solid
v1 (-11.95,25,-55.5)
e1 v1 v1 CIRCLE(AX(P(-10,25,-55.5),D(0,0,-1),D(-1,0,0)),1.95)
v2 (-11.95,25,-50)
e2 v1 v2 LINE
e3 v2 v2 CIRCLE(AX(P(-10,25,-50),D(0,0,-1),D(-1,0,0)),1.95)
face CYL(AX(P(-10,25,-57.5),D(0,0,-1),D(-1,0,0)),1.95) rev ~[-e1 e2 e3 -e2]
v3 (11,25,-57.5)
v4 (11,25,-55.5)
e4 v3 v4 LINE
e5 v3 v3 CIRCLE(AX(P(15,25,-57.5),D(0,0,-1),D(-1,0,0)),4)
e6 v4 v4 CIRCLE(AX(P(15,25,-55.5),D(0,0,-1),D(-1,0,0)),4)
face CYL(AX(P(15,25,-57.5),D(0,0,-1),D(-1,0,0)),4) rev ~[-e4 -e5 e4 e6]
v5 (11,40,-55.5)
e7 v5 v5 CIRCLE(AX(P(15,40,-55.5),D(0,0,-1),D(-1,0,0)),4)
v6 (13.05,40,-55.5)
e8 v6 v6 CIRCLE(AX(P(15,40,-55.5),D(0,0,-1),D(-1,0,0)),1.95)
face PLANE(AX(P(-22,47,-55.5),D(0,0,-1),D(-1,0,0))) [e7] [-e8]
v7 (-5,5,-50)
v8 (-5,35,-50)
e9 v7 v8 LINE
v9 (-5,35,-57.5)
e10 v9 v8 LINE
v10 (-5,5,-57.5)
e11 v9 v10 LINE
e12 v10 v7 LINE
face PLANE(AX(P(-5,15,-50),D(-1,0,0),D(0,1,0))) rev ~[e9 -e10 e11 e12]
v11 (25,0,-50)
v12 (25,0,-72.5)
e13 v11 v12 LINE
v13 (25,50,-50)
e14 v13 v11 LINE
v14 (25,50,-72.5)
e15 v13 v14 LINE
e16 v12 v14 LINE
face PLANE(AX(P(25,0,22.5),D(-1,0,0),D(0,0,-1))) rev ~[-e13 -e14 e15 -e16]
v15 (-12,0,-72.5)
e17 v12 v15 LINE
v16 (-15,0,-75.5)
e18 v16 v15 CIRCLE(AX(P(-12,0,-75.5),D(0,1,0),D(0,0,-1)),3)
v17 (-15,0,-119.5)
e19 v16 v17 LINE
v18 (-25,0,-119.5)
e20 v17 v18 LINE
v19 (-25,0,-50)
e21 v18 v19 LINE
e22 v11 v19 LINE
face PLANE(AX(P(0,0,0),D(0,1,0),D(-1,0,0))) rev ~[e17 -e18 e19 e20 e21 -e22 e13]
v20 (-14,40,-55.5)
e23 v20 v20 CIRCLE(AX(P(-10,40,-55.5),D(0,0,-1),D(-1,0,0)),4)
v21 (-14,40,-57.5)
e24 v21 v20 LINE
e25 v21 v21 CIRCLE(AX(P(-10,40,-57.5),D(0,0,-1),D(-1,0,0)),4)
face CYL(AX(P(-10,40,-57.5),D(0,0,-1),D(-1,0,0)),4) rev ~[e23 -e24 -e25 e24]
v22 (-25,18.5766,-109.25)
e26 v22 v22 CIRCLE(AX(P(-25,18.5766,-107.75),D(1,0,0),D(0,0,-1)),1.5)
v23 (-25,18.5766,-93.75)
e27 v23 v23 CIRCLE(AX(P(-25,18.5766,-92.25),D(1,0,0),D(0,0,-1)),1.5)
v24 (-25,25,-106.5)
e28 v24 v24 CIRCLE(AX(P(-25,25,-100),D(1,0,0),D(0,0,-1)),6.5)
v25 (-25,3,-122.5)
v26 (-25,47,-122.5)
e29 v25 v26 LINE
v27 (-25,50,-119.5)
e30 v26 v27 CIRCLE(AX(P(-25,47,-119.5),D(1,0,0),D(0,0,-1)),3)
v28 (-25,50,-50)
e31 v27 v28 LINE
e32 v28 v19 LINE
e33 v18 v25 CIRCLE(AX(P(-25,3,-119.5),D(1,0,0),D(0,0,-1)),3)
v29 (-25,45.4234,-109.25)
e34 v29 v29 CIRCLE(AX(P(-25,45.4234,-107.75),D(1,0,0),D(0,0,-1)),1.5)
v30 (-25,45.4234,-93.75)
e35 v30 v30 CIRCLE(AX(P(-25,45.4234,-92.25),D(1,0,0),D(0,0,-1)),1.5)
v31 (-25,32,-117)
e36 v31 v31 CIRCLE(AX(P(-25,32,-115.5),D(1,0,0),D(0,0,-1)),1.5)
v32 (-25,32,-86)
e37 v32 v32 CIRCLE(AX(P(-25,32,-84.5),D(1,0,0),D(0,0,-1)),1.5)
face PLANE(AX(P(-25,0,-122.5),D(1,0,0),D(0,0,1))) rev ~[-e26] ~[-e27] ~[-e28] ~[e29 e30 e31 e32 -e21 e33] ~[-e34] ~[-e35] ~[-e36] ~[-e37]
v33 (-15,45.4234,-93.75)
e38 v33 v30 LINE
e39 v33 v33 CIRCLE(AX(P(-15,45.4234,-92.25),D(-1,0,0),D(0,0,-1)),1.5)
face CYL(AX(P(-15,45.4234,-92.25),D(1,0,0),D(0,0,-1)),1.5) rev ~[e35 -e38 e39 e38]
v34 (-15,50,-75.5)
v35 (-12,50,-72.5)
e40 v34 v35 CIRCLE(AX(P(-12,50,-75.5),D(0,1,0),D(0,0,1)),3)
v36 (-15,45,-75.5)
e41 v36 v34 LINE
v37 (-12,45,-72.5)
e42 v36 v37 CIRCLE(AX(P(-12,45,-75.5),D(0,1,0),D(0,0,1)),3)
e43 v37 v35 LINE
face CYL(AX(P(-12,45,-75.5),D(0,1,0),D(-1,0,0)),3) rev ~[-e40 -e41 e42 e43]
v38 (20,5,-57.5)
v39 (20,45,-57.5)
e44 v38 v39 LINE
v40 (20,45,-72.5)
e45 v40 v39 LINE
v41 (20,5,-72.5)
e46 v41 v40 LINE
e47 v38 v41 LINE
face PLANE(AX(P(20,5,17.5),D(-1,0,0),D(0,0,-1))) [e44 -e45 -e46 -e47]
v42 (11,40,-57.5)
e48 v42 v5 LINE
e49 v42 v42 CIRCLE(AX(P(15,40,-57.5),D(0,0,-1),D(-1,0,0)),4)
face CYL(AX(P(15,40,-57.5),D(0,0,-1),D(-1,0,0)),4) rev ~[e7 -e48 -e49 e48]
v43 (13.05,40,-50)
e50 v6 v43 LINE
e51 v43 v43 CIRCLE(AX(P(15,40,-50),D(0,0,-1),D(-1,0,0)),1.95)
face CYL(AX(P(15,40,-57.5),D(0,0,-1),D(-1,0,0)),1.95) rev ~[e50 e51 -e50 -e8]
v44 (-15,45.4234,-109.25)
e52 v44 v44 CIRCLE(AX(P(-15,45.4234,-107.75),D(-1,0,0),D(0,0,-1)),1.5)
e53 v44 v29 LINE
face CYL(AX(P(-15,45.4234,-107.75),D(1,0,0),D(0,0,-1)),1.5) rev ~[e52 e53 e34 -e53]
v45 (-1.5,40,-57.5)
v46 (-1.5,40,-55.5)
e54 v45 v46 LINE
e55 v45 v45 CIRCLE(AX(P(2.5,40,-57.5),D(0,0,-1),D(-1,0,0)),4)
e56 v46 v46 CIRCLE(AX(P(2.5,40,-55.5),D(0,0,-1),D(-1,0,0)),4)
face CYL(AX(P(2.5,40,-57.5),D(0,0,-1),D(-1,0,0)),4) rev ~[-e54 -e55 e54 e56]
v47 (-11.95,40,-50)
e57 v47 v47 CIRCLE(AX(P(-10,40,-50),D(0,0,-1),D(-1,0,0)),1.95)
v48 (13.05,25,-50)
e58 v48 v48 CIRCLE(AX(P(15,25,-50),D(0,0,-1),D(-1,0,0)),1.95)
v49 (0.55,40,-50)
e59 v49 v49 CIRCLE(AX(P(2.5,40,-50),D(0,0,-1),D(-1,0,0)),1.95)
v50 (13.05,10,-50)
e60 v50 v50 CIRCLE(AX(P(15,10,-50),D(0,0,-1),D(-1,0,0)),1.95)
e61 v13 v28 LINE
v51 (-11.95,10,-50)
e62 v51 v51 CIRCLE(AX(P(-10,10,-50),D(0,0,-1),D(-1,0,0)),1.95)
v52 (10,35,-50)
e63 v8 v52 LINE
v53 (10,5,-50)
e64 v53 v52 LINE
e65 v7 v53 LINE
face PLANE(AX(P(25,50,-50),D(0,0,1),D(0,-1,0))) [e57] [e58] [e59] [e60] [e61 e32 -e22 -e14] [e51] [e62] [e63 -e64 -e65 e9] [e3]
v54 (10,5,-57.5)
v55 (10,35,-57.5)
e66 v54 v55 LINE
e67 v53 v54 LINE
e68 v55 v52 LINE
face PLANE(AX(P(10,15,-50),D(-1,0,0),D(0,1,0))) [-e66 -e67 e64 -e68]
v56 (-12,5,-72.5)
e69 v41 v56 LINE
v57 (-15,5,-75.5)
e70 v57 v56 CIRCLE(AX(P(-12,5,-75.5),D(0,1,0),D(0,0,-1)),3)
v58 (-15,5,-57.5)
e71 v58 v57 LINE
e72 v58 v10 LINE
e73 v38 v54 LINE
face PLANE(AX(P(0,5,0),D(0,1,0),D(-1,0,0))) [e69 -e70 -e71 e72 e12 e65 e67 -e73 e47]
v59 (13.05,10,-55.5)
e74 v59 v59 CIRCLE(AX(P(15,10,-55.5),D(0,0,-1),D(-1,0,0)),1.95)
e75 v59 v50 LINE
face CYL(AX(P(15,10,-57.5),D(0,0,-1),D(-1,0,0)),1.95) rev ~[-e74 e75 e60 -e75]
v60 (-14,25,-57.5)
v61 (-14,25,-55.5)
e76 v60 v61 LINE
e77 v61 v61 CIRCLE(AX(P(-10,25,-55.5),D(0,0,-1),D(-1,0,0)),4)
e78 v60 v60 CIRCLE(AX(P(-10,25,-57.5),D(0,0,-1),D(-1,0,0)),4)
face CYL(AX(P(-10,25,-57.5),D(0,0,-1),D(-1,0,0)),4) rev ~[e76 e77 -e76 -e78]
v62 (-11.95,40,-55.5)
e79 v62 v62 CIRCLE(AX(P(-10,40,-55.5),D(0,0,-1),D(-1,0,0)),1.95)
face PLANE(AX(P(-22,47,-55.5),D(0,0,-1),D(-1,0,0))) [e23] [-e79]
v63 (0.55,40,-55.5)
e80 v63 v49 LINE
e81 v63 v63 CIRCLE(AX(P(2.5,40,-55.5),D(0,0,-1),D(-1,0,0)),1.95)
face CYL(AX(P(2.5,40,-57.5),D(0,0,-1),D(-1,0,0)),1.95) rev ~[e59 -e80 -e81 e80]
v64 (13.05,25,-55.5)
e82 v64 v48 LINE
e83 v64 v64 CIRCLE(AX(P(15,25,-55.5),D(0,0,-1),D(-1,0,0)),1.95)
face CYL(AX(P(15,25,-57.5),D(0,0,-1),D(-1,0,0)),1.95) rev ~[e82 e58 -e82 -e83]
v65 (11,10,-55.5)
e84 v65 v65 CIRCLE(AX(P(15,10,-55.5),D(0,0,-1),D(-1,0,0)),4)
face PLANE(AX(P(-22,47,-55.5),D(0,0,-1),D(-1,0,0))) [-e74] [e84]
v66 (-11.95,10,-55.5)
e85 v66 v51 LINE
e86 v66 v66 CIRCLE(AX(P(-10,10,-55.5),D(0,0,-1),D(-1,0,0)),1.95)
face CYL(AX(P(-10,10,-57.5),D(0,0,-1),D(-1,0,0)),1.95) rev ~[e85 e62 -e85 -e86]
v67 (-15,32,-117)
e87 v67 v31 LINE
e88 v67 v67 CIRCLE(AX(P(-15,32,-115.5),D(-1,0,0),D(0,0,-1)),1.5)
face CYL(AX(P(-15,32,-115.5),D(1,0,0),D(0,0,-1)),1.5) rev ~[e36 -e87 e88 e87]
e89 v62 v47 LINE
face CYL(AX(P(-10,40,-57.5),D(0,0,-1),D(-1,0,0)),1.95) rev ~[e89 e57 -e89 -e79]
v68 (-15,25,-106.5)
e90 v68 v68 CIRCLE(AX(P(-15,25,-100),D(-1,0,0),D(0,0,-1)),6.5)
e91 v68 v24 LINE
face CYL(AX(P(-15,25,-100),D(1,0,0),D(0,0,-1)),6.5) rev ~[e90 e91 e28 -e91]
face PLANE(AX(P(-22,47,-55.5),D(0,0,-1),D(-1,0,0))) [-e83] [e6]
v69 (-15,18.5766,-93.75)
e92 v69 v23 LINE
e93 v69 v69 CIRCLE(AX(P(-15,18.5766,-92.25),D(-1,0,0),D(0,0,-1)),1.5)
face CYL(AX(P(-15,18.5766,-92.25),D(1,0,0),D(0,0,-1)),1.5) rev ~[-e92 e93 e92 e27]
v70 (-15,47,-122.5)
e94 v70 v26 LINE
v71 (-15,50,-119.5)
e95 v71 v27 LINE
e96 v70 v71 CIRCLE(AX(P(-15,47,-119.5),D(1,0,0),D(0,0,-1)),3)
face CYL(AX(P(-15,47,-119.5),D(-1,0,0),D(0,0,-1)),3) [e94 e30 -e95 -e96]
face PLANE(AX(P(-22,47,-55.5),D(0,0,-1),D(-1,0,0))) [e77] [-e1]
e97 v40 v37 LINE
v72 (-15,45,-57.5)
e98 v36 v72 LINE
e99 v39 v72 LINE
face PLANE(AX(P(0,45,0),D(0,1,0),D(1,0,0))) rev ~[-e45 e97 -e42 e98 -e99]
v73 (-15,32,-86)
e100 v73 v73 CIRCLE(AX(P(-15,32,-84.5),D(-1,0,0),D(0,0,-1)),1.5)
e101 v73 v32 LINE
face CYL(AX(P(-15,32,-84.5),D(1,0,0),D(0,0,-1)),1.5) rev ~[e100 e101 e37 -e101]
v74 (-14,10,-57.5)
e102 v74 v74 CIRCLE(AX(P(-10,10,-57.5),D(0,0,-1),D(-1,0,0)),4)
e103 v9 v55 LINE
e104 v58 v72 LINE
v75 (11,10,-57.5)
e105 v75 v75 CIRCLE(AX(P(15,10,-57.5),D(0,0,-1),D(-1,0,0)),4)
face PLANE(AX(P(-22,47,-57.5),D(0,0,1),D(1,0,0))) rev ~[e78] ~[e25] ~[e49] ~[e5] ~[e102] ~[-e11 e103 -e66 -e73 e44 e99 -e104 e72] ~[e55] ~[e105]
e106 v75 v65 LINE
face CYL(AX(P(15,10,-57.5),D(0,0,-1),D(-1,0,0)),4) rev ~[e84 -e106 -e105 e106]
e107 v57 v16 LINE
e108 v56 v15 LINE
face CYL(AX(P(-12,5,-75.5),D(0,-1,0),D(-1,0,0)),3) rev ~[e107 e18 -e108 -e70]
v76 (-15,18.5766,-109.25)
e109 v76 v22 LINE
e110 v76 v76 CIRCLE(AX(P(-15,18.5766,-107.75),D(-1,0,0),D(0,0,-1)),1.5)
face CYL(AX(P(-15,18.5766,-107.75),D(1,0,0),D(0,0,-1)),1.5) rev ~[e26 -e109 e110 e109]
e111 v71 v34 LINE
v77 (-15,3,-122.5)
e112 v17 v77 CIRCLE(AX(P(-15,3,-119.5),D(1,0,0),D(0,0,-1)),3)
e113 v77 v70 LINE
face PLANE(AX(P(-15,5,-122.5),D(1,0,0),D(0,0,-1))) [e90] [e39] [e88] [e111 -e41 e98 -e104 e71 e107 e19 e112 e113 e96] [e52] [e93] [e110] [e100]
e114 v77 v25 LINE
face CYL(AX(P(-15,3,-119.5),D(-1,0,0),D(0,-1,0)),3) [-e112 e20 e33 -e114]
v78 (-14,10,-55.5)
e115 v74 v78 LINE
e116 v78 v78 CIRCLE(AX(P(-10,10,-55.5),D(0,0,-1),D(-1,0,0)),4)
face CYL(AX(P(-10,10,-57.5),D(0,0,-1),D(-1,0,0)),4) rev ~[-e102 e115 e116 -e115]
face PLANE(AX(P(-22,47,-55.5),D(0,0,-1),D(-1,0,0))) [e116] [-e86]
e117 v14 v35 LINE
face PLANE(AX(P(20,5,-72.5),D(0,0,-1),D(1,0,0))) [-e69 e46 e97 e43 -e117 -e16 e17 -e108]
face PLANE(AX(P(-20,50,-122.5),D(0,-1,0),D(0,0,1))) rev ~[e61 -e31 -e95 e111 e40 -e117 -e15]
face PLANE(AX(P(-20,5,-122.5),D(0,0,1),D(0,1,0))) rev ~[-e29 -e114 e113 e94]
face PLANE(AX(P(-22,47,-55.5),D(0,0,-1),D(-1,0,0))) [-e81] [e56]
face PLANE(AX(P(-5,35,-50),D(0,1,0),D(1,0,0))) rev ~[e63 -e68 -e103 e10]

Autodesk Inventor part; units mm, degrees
ref_plane "YZ Plane" through (0, 0, 0) normal (1, 0, 0) x (0, 1, 0)
ref_plane "XZ Plane" through (0, 0, 0) normal (0, 1, 0) x (-1, 0, 0)
sketch "Sketch1" plane through (0, 0, 0) normal (0, 1, 0) x (-1, 0, 0)
  line L0 (25, 22.5) -> (-25, 22.5)
  line L1 (-25, 22.5) -> (-25, -122.5)
  line L2 (-25, -122.5) -> (25, -122.5)
  line L3 (25, -122.5) -> (25, 22.5)
  circle A0 centre (0, 0) radius 3.4379
  dimension "d0" = 50
  dimension "d1" = 145
  dimension "d2" = 25
  dimension "d3" = 22.5
  dimension "d4" = 6.8759
  dimension "d5" = 0
  dimension "d6" = 0
extrude "Extrusion1" add sketch "Sketch1" along normal blind 5 contours L3 L2 L1 L0 | A0
sketch "Sketch2" plane through (0, 5, 0) normal (0, 1, 0) x (1, 0, 0)
  line L0 (-20, -17.5) -> (20, -17.5)
  line L1 (20, -17.5) -> (20, 117.5)
  line L2 (20, 117.5) -> (-20, 117.5)
  line L3 (-20, 117.5) -> (-20, -17.5)
  line L4 (-25, -22.5) -> (25, -22.5) projected
  line L5 (-25, 122.5) -> (-25, -22.5) projected
  line L6 (25, -22.5) -> (25, 122.5) projected
  line L7 (25, 122.5) -> (-25, 122.5) projected
  line L8 (-25, 72.5) -> (25, 72.5)
  point P0 (0, 0)
  point P1 (-20, 72.5)
  point P2 (20, 72.5)
  dimension "d9" = 5
  dimension "d10" = 5
  dimension "d11" = 5
  dimension "d12" = 5
  dimension "d13" = 50
extrude "Extrusion2" add sketch "Sketch2" along normal blind 45 contours L0 L1 L8 L6 L4 L5 L3
sketch "Sketch3" plane through (0, 50, 0) normal (0, 1, 0) x (1, 0, 0)
  line L0 (-25, -22.5) -> (25, -22.5) projected
  line L1 (25, 72.5) -> (25, 122.5) projected
  line L2 (-25, -22.5) -> (25, -22.5)
  line L3 (25, -22.5) -> (25, 72.5)
  line L4 (25, 72.5) -> (-25, 72.5)
  line L5 (-25, 72.5) -> (-25, -22.5)
  point P0 (0, 0)
extrude "Extrusion3" add sketch "Sketch3" against normal blind 5
sketch "Sketch4" plane through (20, 5, 17.5) normal (0, 0, -1) x (-1, 0, 0)
  line L0 (0, 0) -> (0, 40) projected
  line L1 (40, 0) -> (40, 40) projected
  line L2 (0, 20) -> (40, 20)
  line L3 (40, 20) -> (40, 0)
  line L4 (40, 0) -> (0, 0)
  line L5 (0, 0) -> (0, 20)
  point P0 (20, -5)
  dimension "d18" = 20
extrude "Extrusion4" add sketch "Sketch4" along normal blind 45
sketch "Sketch5" plane through (0, 0, 0) normal (0, -1, 0) x (1, 0, 0)
  circle A0 centre (0, 0) radius 9.5
  dimension "d21" = 19
extrude "Extrusion5" cut sketch "Sketch5" against normal blind 12
sketch "Sketch6" plane through (0, 0, 0) normal (0, -1, 0) x (1, 0, 0)
  circle A0 centre (0, 0) radius 11.5
  dimension "d24" = 23
extrude "Extrusion6" cut sketch "Sketch6" against normal blind 6.5
sketch "Sketch7" plane through (0, 12, 0) normal (0, -1, 0) x (1, 0, 0)
  circle A0 centre (0, 0) radius 6.2
  line L0 (0, 6.7252) -> (0, 0)
  line L1 (0, 0) -> (-6.727, -3.8838)
  line L2 (0, 0) -> (6.6601, -3.8452)
  circle A1 centre (0, 6.2) radius 1.45
  circle A2 centre (-5.3694, -3.1) radius 1.45
  circle A3 centre (5.3694, -3.1) radius 1.45
  dimension "d27" = 12.4
  dimension "d28" = 120
  dimension "d29" = 120
  dimension "d30" = 2.9
  dimension "d31" = 2.9
  dimension "d32" = 2.9
extrude "Extrusion7" cut sketch "Sketch7" against normal blind 15 contours A1 L0 A0 | A0 A1 | A3 L2 A0 | A0 L2 A3 | L0 A1 A0 | L2 A3 A0 | A0 A3 L2 | A2 L1 A0 | A0 L1 A2 | A2 A0 L1 | A2 L1 A0
sketch "Sketch8" plane through (-20, 25, 17.5) normal (0, 1, 0) x (1, 0, 0)
  circle A0 centre (14.6306, 20.6) radius 1.45 projected
  circle A1 centre (14.6306, 20.6) radius 4
  circle A2 centre (20, 11.3) radius 1.45 projected
  circle A3 centre (20, 11.3) radius 4
  circle A4 centre (25.3694, 20.8298) radius 4
  point P0 (20, 17.5)
  dimension "d35" = 8
  dimension "d36" = 8
  dimension "d37" = 8
extrude "Extrusion8" cut sketch "Sketch8" against normal blind 7
sketch "Sketch10" plane through (-20, 5, -72.5) normal (1, 0, 0) x (0, 0, -1)
  line L0 (-45, 20) -> (-45, 0) projected
  line L1 (-45, 0) -> (50, 0)
  line L2 (50, 0) -> (50, 45)
  line L3 (50, 45) -> (-45, 45)
  line L4 (-45, 45) -> (-45, 0)
  point P0 (-72.5, -5)
  dimension "d44" = 45
  dimension "d45" = 95
extrude "Extrusion9" add sketch "Sketch10" against normal blind 5
sketch "Sketch11" plane through (-20, 5, -122.5) normal (1, 0, 0) x (0, 0, -1)
  line L0 (-140, 20) -> (-95, 20) projected
  line L1 (-140, 40) -> (-140, 20)
  line L2 (-140, 20) -> (-95, 20)
  line L3 (-95, 20) -> (-95, 0.1891)
  line L4 (0, 0) -> (-95, 0) projected
  line L5 (-95, 0.1891) -> (-95, 0)
  line L6 (-95, 0) -> (0, 0)
  line L7 (0, 0) -> (0, 45) projected
  line L8 (0, 0) -> (0, 45)
  line L9 (0, 45) -> (-50, 45)
  line L10 (-50, 40) -> (-50, 45) projected
  line L11 (-50, 45) -> (-50, 40)
  line L12 (-50, 40) -> (-140, 40)
  point P0 (-122.5, -5)
  point P1 (-50, 45)
extrude "Extrusion10" add sketch "Sketch11" along normal blind 5
sketch "Sketch12" plane through (-15, 5, -122.5) normal (1, 0, 0) x (0, 0, -1)
  circle A0 centre (-22.5, 20) radius 6.5
  circle A1 centre (50.1316, 17.215) radius 18.4
  circle A2 centre (57.8816, 30.6384) radius 1.5
  circle A3 centre (57.8816, 30.6384) radius 1.5
  circle A4 centre (65.6316, 17.215) radius 1.5
  circle A5 centre (65.6316, 17.215) radius 1.5
  circle A6 centre (57.8816, 3.7916) radius 1.5
  circle A7 centre (57.8816, 3.7916) radius 1.5
  circle A8 centre (42.3816, 3.7916) radius 1.5
  circle A9 centre (42.3816, 3.7916) radius 1.5
  circle A10 centre (34.6316, 17.215) radius 1.5
  circle A11 centre (34.6316, 17.215) radius 1.5
  circle A12 centre (42.3816, 30.6384) radius 1.5
  circle A13 centre (42.3816, 30.6384) radius 1.5
  circle A14 centre (50.1316, 17.215) radius 15.5
  circle A15 centre (50.1316, 17.215) radius 18.4
  line L0 (57.8816, 30.6384) -> (50.1316, 17.215)
  line L1 (50.1316, 17.215) -> (65.6316, 17.215)
  line L2 (42.3816, 3.7916) -> (50.1316, 17.215)
  line L3 (50.1316, 17.215) -> (34.6316, 17.215)
  line L4 (42.3816, 30.6384) -> (50.1316, 17.215)
  line L5 (57.8816, 3.7916) -> (50.1316, 17.215)
  circle A16 centre (50.1316, 10.215) radius 6
  circle A17 centre (50.1316, 10.215) radius 6
  circle A18 centre (-22.5, 27) radius 15.5
  line L6 (0, 0) -> (0, 45) projected
  line L7 (0, 45) -> (-50, 45) projected
  line L8 (-22.5, 27) -> (-4.9973, 27)
  line L9 (-22.5, 27) -> (-39.7636, 27)
  line L10 (-22.5, 27) -> (-13.3528, 42.8433)
  line L11 (-22.5, 27) -> (-30.25, 40.4234)
  line L12 (-22.5, 27) -> (-30.25, 13.5766)
  line L13 (-22.5, 27) -> (-14.75, 13.5766)
  circle A19 centre (-14.75, 40.4234) radius 1.5
  circle A20 centre (-30.25, 40.4234) radius 1.5
  circle A21 centre (-7, 27) radius 1.5
  circle A22 centre (-38, 27) radius 1.5
  circle A23 centre (-30.25, 13.5766) radius 1.5
  circle A24 centre (-14.75, 13.5766) radius 1.5
  point P0 (-122.5, -5)
  dimension "d60" = 31
  dimension "d52" = 13
  dimension "d53" = 36.8
  dimension "d54" = 3
  dimension "d55" = 3
  dimension "d56" = 3
  dimension "d57" = 3
  dimension "d58" = 3
  dimension "d59" = 3
  dimension "d61" = 7
  dimension "d62" = 60
  dimension "d63" = 60
  dimension "d64" = 15.5
  dimension "d65" = 12
  dimension "d66" = 31
  dimension "d67" = 7
  dimension "d68" = 22.5
  dimension "d69" = 18
  dimension "d70" = 25
  dimension "d71" = 60
  dimension "d72" = 60
  dimension "d73" = 60
  dimension "d74" = 3
  dimension "d75" = 3
  dimension "d76" = 3
  dimension "d77" = 3
  dimension "d78" = 3
  dimension "d79" = 3
extrude "Extrusion11" cut sketch "Sketch12" against normal blind 10 contours A0 L13 | L13 A0 L12 | L12 A0 | A24 A18 L13 | L13 A18 A24 | A21 A18 L8 | L8 A18 A21 | A22 A18 L9 | L9 A18 A22 | A19 A18 L10 | L10 A18 A19 | A20 A18 L11 | L11 A18 A20 | A23 A18 L12 | L12 A18 A23 | A18 A24 | L8 A21 A18 | A18 A21 L8 | L9 A22 A18 | A18 A22 L9 | L10 A19 A18 | A18 A19 L10 | A18 A20 | A18 A23 picked at (-20.282, 19.0179)
sketch "Sketch13" plane through (0, 50, 0) normal (0, 1, 0) x (1, 0, 0)
  line L0 (-15, 27.5) -> (-15, -17.5) projected
  line L1 (20, -17.5) -> (20, 72.5) projected
  line L2 (-15, -17.5) -> (20, -17.5)
  line L3 (20, -17.5) -> (20, 27.5)
  line L4 (20, 27.5) -> (-15, 27.5)
  line L5 (-15, 27.5) -> (-15, -17.5)
  line L6 (-15, -17.5) -> (15, -17.5)
  line L7 (15, -17.5) -> (15, 27.5)
  line L8 (15, 27.5) -> (-15, 27.5)
  line L9 (-15, 27.5) -> (-15, -17.5)
  line L10 (-17.6229, -12.5) -> (23.226, -12.5)
  line L11 (25, -22.5) -> (25, 122.5) projected
  line L12 (-25, -22.5) -> (25, -22.5) projected
  point P0 (0, 0)
  point P1 (-15, 27.5)
  point P2 (-15, -12.5)
  point P3 (15, -12.5)
  dimension "d82" = 45
  dimension "d83" = 30
  dimension "d100" = 10
extrude "Extrusion12" cut sketch "Sketch13" against normal blind 10 contours L4 L7 L10 L0
sketch "Sketch14" plane through (25, 0, 22.5) normal (1, 0, 0) x (0, 0, -1)
  line L0 (145, 5) -> (50, 5) projected
  line L1 (95, 5) -> (95, 50) projected
  line L2 (10, 45) -> (85, 45)
  line L3 (85, 45) -> (85, 5)
  line L4 (85, 5) -> (10, 5)
  line L5 (10, 5) -> (10, 45)
  line L6 (0, 0) -> (0, 50) projected
  line L7 (0, 50) -> (95, 50) projected
  line L8 (0, 0) -> (145, 0) projected
  line L9 (10, 37) -> (90.8755, 37)
  line L10 (90.8755, 29) -> (3.3121, 29)
  line L11 (50, 25) -> (5, 25) projected
  line L12 (5, 21) -> (92.1289, 21)
  line L13 (3.3121, 13) -> (95, 13)
  line L14 (50, 5) -> (50, 25) projected
  line L15 (50, 5) -> (50, 25)
  line L16 (50, 25) -> (10, 25)
  line L17 (50, 25) -> (5, 25) projected
  line L18 (65, 47.5096) -> (65, 32.8574)
  point P0 (22.5, 0)
  point P1 (5, 45)
  point P2 (3.3121, 29)
  point P3 (85, 13)
  point P4 (10, 13)
  point P5 (85, 5)
  point P6 (10, 21)
  point P7 (85, 21)
  point P8 (85, 29)
  point P9 (10, 29)
  point P10 (85, 37)
  point P11 (50, 21)
  point P12 (10, 25)
  point P13 (50, 13)
  point P14 (65, 37)
  point P15 (65, 45)
  dimension "d87" = 10
  dimension "d88" = 10
  dimension "d89" = 5
  dimension "d90" = 5
  dimension "d91" = 8
  dimension "d92" = 8
  dimension "d93" = 8
  dimension "d94" = 8
  dimension "d162" = 30
extrude "Extrusion13" cut sketch "Sketch14" against normal blind 5 contours L9 L5 L2 L18
fillet "Fillet1" radius 3 6 edges at (-15, 47.5, -72.5) (-15, 25, -5) (2.5, 25, 17.5) (20, 35, 17.5) (-15, 47.5, -27.5) (15, 47.5, -27.5)
fillet "Fillet2" radius 3 4 edges at (22.5, 45, 12.5) (22.5, 37, 12.5) (22.5, 37, -42.5) (22.5, 45, -42.5)
fillet "Fillet3" radius 3 4 edges at (25, 25, 22.5) (0, 0, 22.5) (-25, 25, 22.5) (0, 50, 22.5)
fillet "Fillet4" radius 3 2 edges at (-15, 47.5, 12.5) (15, 47.5, 12.5)
sketch "Sketch15" plane through (20, 5, -27.5) normal (0, 0, -1) x (-1, 0, 0)
  circle A0 centre (20, 3.75) radius 1.95
  line L0 (45, -5) -> (45, 45) projected
  line L1 (-5, -5) -> (45, -5) projected
  point P0 (20, -5)
  dimension "d102" = 25
  dimension "d103" = 8.75
  dimension "d107" = 3.9
extrude "Extrusion14" cut sketch "Sketch15" against normal blind 20
sketch "Sketch16" plane through (20, 5, -27.5) normal (0, 0, -1) x (-1, 0, 0)
  circle A0 centre (20, 3.75) radius 1.95 projected
  circle A1 centre (20, 3.75) radius 4
  point P0 (20, -5)
  dimension "d106" = 8
extrude "Extrusion15" cut sketch "Sketch16" against normal blind 8
sketch "Sketch17" plane through (0, 5, 0) normal (0, 1, 0) x (1, 0, 0)
  line L0 (20, 72.5) -> (25, 72.5) projected
  line L1 (-15, 122.5) -> (-15, 75.5) projected
  line L2 (25, 72.5) -> (-15, 72.5)
  line L3 (-15, 72.5) -> (-15, 122.5)
  line L4 (-15, 122.5) -> (25, 122.5)
  line L5 (25, 122.5) -> (25, 72.5)
  point P0 (0, 0)
extrude "Extrusion16" cut sketch "Sketch17" against normal blind 8
fillet "Fillet5" radius 3 1 edges at (-15, 2.5, -72.5)
fillet "Fillet6" radius 3 2 edges at (-20, 50, -122.5) (-20, 0, -122.5)
sketch "Sketch18" plane through (25, 0, -72.5) normal (1, 0, 0) x (0, 0, -1)
  line L0 (-92, 50) -> (0, 50) projected
  line L1 (-92, 0) -> (0, 0) projected
  line L2 (-95, 50) -> (-22.5, 50)
  line L3 (-22.5, 50) -> (-22.5, 0)
  line L4 (-22.5, 0) -> (-95, 0)
  line L5 (-95, 0) -> (-95, 50)
  line L6 (50, 47) -> (50, 3) projected
  line L7 (-95, 47) -> (-95, 3) projected
  point P0 (-72.5, 0)
  dimension "d114" = 72.5
  dimension "d115" = 0
ref_plane "Work Plane1" through (-22, 47, -50) normal (0, 0, 1) x (1, 0, 0)
sketch "Sketch19" plane through (-22, 47, -50) normal (0, 0, 1) x (1, 0, 0)
  line L0 (42, -2) -> (42, -5) projected
  line L1 (42, -2) -> (32, -2)
  line L2 (32, -2) -> (32, -12)
  line L3 (32, -12) -> (42, -12)
  line L4 (42, -12) -> (42, -2)
  line L5 (7, -2) -> (10, -2) projected
  line L6 (7, -2) -> (17, -2)
  line L7 (17, -2) -> (17, -12)
  line L8 (17, -12) -> (7, -12)
  line L9 (7, -12) -> (7, -2)
  line L10 (7, -42) -> (20.6081, -42) projected
  line L11 (7, -42) -> (17, -42)
  line L12 (17, -42) -> (17, -32)
  line L13 (17, -32) -> (7, -32)
  line L14 (7, -32) -> (7, -42)
  line L15 (42, -42) -> (42, -22) projected
  line L16 (42, -42) -> (32, -42)
  line L17 (32, -42) -> (32, -32)
  line L18 (32, -32) -> (42, -32)
  line L19 (42, -32) -> (42, -42)
  line L20 (17, -12) -> (32, -12)
  line L21 (32, -12) -> (32, -2)
  line L22 (32, -2) -> (17, -2)
  line L23 (17, -2) -> (17, -12)
  line L24 (32, -12) -> (42, -12)
  line L25 (42, -12) -> (42, -32)
  line L26 (42, -32) -> (32, -32)
  line L27 (32, -32) -> (32, -12)
  line L28 (17, -12) -> (7, -12)
  line L29 (7, -12) -> (7, -32)
  line L30 (7, -32) -> (17, -32)
  line L31 (17, -32) -> (17, -12)
  point P0 (22, -47)
  point P1 (42, -5)
  point P2 (10, -2)
  point P3 (32, -12)
  point P4 (32, -12)
  point P5 (32, -12)
  point P6 (32, -12)
  point P7 (42, -12)
  point P8 (7, -12)
  point P9 (17, -2)
  dimension "d117" = 10
  dimension "d118" = 10
  dimension "d119" = 10
  dimension "d120" = 10
  dimension "d121" = 10
  dimension "d122" = 10
  dimension "d123" = 10
extrude "Extrusion17" add sketch "Sketch19" along normal mid plane 15
sketch "Sketch20" plane through (-22, 47, -57.5) normal (0, 0, -1) x (-1, 0, 0)
  circle A0 centre (-12, -37) radius 1.95
  circle A1 centre (-37, -37) radius 1.95
  circle A2 centre (-37, -7) radius 1.95
  circle A3 centre (-12, -7) radius 1.95
  circle A4 centre (-12, -22) radius 1.95
  circle A5 centre (-37, -22) radius 1.95
  line L0 (-7, 0) -> (-7, -44) projected
  line L1 (-42, -42) -> (-10, -42) projected
  line L2 (-10, -2) -> (-42, -2) projected
  line L3 (-42, -42) -> (-42, -2) projected
  circle A6 centre (-24.5, -7) radius 1.95
  point P0 (-22, -47)
  dimension "d126" = 5
  dimension "d127" = 5
  dimension "d128" = 3.9
  dimension "d129" = 5
  dimension "d130" = 5
  dimension "d131" = 3.9
  dimension "d132" = 5
  dimension "d133" = 5
  dimension "d134" = 3.9
  dimension "d135" = 5
  dimension "d136" = 5
  dimension "d137" = 3.9
  dimension "d138" = 15
  dimension "d139" = 5
  dimension "d140" = 3.9
  dimension "d141" = 15
  dimension "d142" = 5
  dimension "d143" = 3.9
  dimension "d158" = 3.9
  dimension "d159" = 5
  dimension "d160" = 12.5
extrude "Extrusion18" cut sketch "Sketch20" against normal blind 15
sketch "Sketch21" plane through (-22, 47, -42.5) normal (0, 0, 1) x (1, 0, 0)
  circle A0 centre (12, -22) radius 1.95 projected
  circle A1 centre (12, -22) radius 4
  circle A2 centre (12, -7) radius 1.95 projected
  circle A3 centre (12, -7) radius 4
  circle A4 centre (37, -22) radius 1.95 projected
  circle A5 centre (37, -22) radius 4
  circle A6 centre (37, -7) radius 1.95 projected
  circle A7 centre (37, -7) radius 4
  circle A8 centre (12, -37) radius 1.95 projected
  circle A9 centre (12, -37) radius 4
  circle A10 centre (37, -37) radius 1.95 projected
  circle A11 centre (37, -37) radius 4
  circle A12 centre (24.5, -7) radius 1.95 projected
  circle A13 centre (24.5, -7) radius 4
  point P0 (22, -47)
  dimension "d150" = 8
  dimension "d151" = 8
  dimension "d152" = 8
  dimension "d153" = 8
  dimension "d154" = 8
  dimension "d155" = 8
  dimension "d161" = 8
sketch "Sketch22" plane through (0, 50, 0) normal (0, 1, 0) x (1, 0, 0)
  line L0 (-15, -9.5) -> (-15, 24.5) projected
  line L1 (-15, 24.5) -> (15, 24.5)
  line L2 (15, 24.5) -> (15, 32.5)
  line L3 (15, 32.5) -> (-15, 32.5)
  line L4 (-15, 32.5) -> (-15, 24.5)
  line L5 (-15, 42.5) -> (20, 42.5) projected
  point P0 (0, 0)
  point P1 (25, 42.5)
  dimension "d146" = 10
extrude "Extrusion19" cut sketch "Sketch22" against normal blind 10
fillet "Fillet7" radius 3 2 edges at (-15, 47.5, -32.5) (15, 47.5, -32.5)
extrude "Extrusion20" cut sketch "Sketch21" against normal blind 4
sketch "Sketch23" plane through (-22, 47, 22.5) normal (0, 0, 1) x (1, 0, 0)
  line L0 (7, -19) -> (7, -2) projected
  line L1 (7, -2) -> (37, -2)
  line L2 (37, -2) -> (37, -10)
  line L3 (37, -10) -> (7, -10)
  line L4 (7, -10) -> (7, -2)
  line L5 (47, -47) -> (47, 3) projected
  line L6 (47, 3) -> (-3, 3) projected
  point P0 (22, -47)
  point P1 (7, -10)
  dimension "d163" = 10
  dimension "d164" = 8
  dimension "d165" = 5
extrude "Extrusion21" cut sketch "Sketch23" against normal blind 5
fillet "Fillet8" radius 3 4 edges at (15, 45, 20) (15, 37, 20) (-15, 45, -36) (-15, 37, 20)
extrude "Extrusion22" cut sketch "Sketch18" against normal blind 50
sketch "Sketch24" plane through (-22, 47, -57.5) normal (0, 0, -1) x (-1, 0, 0)
  circle A0 centre (-12, -7) radius 1.95 projected
  circle A1 centre (-12, -7) radius 4
  circle A2 centre (-12, -22) radius 1.95 projected
  circle A3 centre (-12, -22) radius 4
  circle A4 centre (-12, -37) radius 1.95 projected
  circle A5 centre (-12, -37) radius 4
  circle A6 centre (-37, -37) radius 1.95 projected
  circle A7 centre (-37, -37) radius 4
  circle A8 centre (-37, -22) radius 1.95 projected
  circle A9 centre (-37, -22) radius 4
  circle A10 centre (-37, -7) radius 1.95 projected
  circle A11 centre (-37, -7) radius 4
  circle A12 centre (-24.5, -7) radius 1.95 projected
  circle A13 centre (-24.5, -7) radius 4
  point P0 (-22, -47)
  dimension "d171" = 8
  dimension "d172" = 8
  dimension "d173" = 8
  dimension "d174" = 8
  dimension "d175" = 8
  dimension "d176" = 8
  dimension "d177" = 8
extrude "Extrusion23" cut sketch "Sketch24" against normal blind 2 contours A1 | A3 | A4 | A5 | A7 | A9 | A11 | A13
properties part number "Link1r_v2"
